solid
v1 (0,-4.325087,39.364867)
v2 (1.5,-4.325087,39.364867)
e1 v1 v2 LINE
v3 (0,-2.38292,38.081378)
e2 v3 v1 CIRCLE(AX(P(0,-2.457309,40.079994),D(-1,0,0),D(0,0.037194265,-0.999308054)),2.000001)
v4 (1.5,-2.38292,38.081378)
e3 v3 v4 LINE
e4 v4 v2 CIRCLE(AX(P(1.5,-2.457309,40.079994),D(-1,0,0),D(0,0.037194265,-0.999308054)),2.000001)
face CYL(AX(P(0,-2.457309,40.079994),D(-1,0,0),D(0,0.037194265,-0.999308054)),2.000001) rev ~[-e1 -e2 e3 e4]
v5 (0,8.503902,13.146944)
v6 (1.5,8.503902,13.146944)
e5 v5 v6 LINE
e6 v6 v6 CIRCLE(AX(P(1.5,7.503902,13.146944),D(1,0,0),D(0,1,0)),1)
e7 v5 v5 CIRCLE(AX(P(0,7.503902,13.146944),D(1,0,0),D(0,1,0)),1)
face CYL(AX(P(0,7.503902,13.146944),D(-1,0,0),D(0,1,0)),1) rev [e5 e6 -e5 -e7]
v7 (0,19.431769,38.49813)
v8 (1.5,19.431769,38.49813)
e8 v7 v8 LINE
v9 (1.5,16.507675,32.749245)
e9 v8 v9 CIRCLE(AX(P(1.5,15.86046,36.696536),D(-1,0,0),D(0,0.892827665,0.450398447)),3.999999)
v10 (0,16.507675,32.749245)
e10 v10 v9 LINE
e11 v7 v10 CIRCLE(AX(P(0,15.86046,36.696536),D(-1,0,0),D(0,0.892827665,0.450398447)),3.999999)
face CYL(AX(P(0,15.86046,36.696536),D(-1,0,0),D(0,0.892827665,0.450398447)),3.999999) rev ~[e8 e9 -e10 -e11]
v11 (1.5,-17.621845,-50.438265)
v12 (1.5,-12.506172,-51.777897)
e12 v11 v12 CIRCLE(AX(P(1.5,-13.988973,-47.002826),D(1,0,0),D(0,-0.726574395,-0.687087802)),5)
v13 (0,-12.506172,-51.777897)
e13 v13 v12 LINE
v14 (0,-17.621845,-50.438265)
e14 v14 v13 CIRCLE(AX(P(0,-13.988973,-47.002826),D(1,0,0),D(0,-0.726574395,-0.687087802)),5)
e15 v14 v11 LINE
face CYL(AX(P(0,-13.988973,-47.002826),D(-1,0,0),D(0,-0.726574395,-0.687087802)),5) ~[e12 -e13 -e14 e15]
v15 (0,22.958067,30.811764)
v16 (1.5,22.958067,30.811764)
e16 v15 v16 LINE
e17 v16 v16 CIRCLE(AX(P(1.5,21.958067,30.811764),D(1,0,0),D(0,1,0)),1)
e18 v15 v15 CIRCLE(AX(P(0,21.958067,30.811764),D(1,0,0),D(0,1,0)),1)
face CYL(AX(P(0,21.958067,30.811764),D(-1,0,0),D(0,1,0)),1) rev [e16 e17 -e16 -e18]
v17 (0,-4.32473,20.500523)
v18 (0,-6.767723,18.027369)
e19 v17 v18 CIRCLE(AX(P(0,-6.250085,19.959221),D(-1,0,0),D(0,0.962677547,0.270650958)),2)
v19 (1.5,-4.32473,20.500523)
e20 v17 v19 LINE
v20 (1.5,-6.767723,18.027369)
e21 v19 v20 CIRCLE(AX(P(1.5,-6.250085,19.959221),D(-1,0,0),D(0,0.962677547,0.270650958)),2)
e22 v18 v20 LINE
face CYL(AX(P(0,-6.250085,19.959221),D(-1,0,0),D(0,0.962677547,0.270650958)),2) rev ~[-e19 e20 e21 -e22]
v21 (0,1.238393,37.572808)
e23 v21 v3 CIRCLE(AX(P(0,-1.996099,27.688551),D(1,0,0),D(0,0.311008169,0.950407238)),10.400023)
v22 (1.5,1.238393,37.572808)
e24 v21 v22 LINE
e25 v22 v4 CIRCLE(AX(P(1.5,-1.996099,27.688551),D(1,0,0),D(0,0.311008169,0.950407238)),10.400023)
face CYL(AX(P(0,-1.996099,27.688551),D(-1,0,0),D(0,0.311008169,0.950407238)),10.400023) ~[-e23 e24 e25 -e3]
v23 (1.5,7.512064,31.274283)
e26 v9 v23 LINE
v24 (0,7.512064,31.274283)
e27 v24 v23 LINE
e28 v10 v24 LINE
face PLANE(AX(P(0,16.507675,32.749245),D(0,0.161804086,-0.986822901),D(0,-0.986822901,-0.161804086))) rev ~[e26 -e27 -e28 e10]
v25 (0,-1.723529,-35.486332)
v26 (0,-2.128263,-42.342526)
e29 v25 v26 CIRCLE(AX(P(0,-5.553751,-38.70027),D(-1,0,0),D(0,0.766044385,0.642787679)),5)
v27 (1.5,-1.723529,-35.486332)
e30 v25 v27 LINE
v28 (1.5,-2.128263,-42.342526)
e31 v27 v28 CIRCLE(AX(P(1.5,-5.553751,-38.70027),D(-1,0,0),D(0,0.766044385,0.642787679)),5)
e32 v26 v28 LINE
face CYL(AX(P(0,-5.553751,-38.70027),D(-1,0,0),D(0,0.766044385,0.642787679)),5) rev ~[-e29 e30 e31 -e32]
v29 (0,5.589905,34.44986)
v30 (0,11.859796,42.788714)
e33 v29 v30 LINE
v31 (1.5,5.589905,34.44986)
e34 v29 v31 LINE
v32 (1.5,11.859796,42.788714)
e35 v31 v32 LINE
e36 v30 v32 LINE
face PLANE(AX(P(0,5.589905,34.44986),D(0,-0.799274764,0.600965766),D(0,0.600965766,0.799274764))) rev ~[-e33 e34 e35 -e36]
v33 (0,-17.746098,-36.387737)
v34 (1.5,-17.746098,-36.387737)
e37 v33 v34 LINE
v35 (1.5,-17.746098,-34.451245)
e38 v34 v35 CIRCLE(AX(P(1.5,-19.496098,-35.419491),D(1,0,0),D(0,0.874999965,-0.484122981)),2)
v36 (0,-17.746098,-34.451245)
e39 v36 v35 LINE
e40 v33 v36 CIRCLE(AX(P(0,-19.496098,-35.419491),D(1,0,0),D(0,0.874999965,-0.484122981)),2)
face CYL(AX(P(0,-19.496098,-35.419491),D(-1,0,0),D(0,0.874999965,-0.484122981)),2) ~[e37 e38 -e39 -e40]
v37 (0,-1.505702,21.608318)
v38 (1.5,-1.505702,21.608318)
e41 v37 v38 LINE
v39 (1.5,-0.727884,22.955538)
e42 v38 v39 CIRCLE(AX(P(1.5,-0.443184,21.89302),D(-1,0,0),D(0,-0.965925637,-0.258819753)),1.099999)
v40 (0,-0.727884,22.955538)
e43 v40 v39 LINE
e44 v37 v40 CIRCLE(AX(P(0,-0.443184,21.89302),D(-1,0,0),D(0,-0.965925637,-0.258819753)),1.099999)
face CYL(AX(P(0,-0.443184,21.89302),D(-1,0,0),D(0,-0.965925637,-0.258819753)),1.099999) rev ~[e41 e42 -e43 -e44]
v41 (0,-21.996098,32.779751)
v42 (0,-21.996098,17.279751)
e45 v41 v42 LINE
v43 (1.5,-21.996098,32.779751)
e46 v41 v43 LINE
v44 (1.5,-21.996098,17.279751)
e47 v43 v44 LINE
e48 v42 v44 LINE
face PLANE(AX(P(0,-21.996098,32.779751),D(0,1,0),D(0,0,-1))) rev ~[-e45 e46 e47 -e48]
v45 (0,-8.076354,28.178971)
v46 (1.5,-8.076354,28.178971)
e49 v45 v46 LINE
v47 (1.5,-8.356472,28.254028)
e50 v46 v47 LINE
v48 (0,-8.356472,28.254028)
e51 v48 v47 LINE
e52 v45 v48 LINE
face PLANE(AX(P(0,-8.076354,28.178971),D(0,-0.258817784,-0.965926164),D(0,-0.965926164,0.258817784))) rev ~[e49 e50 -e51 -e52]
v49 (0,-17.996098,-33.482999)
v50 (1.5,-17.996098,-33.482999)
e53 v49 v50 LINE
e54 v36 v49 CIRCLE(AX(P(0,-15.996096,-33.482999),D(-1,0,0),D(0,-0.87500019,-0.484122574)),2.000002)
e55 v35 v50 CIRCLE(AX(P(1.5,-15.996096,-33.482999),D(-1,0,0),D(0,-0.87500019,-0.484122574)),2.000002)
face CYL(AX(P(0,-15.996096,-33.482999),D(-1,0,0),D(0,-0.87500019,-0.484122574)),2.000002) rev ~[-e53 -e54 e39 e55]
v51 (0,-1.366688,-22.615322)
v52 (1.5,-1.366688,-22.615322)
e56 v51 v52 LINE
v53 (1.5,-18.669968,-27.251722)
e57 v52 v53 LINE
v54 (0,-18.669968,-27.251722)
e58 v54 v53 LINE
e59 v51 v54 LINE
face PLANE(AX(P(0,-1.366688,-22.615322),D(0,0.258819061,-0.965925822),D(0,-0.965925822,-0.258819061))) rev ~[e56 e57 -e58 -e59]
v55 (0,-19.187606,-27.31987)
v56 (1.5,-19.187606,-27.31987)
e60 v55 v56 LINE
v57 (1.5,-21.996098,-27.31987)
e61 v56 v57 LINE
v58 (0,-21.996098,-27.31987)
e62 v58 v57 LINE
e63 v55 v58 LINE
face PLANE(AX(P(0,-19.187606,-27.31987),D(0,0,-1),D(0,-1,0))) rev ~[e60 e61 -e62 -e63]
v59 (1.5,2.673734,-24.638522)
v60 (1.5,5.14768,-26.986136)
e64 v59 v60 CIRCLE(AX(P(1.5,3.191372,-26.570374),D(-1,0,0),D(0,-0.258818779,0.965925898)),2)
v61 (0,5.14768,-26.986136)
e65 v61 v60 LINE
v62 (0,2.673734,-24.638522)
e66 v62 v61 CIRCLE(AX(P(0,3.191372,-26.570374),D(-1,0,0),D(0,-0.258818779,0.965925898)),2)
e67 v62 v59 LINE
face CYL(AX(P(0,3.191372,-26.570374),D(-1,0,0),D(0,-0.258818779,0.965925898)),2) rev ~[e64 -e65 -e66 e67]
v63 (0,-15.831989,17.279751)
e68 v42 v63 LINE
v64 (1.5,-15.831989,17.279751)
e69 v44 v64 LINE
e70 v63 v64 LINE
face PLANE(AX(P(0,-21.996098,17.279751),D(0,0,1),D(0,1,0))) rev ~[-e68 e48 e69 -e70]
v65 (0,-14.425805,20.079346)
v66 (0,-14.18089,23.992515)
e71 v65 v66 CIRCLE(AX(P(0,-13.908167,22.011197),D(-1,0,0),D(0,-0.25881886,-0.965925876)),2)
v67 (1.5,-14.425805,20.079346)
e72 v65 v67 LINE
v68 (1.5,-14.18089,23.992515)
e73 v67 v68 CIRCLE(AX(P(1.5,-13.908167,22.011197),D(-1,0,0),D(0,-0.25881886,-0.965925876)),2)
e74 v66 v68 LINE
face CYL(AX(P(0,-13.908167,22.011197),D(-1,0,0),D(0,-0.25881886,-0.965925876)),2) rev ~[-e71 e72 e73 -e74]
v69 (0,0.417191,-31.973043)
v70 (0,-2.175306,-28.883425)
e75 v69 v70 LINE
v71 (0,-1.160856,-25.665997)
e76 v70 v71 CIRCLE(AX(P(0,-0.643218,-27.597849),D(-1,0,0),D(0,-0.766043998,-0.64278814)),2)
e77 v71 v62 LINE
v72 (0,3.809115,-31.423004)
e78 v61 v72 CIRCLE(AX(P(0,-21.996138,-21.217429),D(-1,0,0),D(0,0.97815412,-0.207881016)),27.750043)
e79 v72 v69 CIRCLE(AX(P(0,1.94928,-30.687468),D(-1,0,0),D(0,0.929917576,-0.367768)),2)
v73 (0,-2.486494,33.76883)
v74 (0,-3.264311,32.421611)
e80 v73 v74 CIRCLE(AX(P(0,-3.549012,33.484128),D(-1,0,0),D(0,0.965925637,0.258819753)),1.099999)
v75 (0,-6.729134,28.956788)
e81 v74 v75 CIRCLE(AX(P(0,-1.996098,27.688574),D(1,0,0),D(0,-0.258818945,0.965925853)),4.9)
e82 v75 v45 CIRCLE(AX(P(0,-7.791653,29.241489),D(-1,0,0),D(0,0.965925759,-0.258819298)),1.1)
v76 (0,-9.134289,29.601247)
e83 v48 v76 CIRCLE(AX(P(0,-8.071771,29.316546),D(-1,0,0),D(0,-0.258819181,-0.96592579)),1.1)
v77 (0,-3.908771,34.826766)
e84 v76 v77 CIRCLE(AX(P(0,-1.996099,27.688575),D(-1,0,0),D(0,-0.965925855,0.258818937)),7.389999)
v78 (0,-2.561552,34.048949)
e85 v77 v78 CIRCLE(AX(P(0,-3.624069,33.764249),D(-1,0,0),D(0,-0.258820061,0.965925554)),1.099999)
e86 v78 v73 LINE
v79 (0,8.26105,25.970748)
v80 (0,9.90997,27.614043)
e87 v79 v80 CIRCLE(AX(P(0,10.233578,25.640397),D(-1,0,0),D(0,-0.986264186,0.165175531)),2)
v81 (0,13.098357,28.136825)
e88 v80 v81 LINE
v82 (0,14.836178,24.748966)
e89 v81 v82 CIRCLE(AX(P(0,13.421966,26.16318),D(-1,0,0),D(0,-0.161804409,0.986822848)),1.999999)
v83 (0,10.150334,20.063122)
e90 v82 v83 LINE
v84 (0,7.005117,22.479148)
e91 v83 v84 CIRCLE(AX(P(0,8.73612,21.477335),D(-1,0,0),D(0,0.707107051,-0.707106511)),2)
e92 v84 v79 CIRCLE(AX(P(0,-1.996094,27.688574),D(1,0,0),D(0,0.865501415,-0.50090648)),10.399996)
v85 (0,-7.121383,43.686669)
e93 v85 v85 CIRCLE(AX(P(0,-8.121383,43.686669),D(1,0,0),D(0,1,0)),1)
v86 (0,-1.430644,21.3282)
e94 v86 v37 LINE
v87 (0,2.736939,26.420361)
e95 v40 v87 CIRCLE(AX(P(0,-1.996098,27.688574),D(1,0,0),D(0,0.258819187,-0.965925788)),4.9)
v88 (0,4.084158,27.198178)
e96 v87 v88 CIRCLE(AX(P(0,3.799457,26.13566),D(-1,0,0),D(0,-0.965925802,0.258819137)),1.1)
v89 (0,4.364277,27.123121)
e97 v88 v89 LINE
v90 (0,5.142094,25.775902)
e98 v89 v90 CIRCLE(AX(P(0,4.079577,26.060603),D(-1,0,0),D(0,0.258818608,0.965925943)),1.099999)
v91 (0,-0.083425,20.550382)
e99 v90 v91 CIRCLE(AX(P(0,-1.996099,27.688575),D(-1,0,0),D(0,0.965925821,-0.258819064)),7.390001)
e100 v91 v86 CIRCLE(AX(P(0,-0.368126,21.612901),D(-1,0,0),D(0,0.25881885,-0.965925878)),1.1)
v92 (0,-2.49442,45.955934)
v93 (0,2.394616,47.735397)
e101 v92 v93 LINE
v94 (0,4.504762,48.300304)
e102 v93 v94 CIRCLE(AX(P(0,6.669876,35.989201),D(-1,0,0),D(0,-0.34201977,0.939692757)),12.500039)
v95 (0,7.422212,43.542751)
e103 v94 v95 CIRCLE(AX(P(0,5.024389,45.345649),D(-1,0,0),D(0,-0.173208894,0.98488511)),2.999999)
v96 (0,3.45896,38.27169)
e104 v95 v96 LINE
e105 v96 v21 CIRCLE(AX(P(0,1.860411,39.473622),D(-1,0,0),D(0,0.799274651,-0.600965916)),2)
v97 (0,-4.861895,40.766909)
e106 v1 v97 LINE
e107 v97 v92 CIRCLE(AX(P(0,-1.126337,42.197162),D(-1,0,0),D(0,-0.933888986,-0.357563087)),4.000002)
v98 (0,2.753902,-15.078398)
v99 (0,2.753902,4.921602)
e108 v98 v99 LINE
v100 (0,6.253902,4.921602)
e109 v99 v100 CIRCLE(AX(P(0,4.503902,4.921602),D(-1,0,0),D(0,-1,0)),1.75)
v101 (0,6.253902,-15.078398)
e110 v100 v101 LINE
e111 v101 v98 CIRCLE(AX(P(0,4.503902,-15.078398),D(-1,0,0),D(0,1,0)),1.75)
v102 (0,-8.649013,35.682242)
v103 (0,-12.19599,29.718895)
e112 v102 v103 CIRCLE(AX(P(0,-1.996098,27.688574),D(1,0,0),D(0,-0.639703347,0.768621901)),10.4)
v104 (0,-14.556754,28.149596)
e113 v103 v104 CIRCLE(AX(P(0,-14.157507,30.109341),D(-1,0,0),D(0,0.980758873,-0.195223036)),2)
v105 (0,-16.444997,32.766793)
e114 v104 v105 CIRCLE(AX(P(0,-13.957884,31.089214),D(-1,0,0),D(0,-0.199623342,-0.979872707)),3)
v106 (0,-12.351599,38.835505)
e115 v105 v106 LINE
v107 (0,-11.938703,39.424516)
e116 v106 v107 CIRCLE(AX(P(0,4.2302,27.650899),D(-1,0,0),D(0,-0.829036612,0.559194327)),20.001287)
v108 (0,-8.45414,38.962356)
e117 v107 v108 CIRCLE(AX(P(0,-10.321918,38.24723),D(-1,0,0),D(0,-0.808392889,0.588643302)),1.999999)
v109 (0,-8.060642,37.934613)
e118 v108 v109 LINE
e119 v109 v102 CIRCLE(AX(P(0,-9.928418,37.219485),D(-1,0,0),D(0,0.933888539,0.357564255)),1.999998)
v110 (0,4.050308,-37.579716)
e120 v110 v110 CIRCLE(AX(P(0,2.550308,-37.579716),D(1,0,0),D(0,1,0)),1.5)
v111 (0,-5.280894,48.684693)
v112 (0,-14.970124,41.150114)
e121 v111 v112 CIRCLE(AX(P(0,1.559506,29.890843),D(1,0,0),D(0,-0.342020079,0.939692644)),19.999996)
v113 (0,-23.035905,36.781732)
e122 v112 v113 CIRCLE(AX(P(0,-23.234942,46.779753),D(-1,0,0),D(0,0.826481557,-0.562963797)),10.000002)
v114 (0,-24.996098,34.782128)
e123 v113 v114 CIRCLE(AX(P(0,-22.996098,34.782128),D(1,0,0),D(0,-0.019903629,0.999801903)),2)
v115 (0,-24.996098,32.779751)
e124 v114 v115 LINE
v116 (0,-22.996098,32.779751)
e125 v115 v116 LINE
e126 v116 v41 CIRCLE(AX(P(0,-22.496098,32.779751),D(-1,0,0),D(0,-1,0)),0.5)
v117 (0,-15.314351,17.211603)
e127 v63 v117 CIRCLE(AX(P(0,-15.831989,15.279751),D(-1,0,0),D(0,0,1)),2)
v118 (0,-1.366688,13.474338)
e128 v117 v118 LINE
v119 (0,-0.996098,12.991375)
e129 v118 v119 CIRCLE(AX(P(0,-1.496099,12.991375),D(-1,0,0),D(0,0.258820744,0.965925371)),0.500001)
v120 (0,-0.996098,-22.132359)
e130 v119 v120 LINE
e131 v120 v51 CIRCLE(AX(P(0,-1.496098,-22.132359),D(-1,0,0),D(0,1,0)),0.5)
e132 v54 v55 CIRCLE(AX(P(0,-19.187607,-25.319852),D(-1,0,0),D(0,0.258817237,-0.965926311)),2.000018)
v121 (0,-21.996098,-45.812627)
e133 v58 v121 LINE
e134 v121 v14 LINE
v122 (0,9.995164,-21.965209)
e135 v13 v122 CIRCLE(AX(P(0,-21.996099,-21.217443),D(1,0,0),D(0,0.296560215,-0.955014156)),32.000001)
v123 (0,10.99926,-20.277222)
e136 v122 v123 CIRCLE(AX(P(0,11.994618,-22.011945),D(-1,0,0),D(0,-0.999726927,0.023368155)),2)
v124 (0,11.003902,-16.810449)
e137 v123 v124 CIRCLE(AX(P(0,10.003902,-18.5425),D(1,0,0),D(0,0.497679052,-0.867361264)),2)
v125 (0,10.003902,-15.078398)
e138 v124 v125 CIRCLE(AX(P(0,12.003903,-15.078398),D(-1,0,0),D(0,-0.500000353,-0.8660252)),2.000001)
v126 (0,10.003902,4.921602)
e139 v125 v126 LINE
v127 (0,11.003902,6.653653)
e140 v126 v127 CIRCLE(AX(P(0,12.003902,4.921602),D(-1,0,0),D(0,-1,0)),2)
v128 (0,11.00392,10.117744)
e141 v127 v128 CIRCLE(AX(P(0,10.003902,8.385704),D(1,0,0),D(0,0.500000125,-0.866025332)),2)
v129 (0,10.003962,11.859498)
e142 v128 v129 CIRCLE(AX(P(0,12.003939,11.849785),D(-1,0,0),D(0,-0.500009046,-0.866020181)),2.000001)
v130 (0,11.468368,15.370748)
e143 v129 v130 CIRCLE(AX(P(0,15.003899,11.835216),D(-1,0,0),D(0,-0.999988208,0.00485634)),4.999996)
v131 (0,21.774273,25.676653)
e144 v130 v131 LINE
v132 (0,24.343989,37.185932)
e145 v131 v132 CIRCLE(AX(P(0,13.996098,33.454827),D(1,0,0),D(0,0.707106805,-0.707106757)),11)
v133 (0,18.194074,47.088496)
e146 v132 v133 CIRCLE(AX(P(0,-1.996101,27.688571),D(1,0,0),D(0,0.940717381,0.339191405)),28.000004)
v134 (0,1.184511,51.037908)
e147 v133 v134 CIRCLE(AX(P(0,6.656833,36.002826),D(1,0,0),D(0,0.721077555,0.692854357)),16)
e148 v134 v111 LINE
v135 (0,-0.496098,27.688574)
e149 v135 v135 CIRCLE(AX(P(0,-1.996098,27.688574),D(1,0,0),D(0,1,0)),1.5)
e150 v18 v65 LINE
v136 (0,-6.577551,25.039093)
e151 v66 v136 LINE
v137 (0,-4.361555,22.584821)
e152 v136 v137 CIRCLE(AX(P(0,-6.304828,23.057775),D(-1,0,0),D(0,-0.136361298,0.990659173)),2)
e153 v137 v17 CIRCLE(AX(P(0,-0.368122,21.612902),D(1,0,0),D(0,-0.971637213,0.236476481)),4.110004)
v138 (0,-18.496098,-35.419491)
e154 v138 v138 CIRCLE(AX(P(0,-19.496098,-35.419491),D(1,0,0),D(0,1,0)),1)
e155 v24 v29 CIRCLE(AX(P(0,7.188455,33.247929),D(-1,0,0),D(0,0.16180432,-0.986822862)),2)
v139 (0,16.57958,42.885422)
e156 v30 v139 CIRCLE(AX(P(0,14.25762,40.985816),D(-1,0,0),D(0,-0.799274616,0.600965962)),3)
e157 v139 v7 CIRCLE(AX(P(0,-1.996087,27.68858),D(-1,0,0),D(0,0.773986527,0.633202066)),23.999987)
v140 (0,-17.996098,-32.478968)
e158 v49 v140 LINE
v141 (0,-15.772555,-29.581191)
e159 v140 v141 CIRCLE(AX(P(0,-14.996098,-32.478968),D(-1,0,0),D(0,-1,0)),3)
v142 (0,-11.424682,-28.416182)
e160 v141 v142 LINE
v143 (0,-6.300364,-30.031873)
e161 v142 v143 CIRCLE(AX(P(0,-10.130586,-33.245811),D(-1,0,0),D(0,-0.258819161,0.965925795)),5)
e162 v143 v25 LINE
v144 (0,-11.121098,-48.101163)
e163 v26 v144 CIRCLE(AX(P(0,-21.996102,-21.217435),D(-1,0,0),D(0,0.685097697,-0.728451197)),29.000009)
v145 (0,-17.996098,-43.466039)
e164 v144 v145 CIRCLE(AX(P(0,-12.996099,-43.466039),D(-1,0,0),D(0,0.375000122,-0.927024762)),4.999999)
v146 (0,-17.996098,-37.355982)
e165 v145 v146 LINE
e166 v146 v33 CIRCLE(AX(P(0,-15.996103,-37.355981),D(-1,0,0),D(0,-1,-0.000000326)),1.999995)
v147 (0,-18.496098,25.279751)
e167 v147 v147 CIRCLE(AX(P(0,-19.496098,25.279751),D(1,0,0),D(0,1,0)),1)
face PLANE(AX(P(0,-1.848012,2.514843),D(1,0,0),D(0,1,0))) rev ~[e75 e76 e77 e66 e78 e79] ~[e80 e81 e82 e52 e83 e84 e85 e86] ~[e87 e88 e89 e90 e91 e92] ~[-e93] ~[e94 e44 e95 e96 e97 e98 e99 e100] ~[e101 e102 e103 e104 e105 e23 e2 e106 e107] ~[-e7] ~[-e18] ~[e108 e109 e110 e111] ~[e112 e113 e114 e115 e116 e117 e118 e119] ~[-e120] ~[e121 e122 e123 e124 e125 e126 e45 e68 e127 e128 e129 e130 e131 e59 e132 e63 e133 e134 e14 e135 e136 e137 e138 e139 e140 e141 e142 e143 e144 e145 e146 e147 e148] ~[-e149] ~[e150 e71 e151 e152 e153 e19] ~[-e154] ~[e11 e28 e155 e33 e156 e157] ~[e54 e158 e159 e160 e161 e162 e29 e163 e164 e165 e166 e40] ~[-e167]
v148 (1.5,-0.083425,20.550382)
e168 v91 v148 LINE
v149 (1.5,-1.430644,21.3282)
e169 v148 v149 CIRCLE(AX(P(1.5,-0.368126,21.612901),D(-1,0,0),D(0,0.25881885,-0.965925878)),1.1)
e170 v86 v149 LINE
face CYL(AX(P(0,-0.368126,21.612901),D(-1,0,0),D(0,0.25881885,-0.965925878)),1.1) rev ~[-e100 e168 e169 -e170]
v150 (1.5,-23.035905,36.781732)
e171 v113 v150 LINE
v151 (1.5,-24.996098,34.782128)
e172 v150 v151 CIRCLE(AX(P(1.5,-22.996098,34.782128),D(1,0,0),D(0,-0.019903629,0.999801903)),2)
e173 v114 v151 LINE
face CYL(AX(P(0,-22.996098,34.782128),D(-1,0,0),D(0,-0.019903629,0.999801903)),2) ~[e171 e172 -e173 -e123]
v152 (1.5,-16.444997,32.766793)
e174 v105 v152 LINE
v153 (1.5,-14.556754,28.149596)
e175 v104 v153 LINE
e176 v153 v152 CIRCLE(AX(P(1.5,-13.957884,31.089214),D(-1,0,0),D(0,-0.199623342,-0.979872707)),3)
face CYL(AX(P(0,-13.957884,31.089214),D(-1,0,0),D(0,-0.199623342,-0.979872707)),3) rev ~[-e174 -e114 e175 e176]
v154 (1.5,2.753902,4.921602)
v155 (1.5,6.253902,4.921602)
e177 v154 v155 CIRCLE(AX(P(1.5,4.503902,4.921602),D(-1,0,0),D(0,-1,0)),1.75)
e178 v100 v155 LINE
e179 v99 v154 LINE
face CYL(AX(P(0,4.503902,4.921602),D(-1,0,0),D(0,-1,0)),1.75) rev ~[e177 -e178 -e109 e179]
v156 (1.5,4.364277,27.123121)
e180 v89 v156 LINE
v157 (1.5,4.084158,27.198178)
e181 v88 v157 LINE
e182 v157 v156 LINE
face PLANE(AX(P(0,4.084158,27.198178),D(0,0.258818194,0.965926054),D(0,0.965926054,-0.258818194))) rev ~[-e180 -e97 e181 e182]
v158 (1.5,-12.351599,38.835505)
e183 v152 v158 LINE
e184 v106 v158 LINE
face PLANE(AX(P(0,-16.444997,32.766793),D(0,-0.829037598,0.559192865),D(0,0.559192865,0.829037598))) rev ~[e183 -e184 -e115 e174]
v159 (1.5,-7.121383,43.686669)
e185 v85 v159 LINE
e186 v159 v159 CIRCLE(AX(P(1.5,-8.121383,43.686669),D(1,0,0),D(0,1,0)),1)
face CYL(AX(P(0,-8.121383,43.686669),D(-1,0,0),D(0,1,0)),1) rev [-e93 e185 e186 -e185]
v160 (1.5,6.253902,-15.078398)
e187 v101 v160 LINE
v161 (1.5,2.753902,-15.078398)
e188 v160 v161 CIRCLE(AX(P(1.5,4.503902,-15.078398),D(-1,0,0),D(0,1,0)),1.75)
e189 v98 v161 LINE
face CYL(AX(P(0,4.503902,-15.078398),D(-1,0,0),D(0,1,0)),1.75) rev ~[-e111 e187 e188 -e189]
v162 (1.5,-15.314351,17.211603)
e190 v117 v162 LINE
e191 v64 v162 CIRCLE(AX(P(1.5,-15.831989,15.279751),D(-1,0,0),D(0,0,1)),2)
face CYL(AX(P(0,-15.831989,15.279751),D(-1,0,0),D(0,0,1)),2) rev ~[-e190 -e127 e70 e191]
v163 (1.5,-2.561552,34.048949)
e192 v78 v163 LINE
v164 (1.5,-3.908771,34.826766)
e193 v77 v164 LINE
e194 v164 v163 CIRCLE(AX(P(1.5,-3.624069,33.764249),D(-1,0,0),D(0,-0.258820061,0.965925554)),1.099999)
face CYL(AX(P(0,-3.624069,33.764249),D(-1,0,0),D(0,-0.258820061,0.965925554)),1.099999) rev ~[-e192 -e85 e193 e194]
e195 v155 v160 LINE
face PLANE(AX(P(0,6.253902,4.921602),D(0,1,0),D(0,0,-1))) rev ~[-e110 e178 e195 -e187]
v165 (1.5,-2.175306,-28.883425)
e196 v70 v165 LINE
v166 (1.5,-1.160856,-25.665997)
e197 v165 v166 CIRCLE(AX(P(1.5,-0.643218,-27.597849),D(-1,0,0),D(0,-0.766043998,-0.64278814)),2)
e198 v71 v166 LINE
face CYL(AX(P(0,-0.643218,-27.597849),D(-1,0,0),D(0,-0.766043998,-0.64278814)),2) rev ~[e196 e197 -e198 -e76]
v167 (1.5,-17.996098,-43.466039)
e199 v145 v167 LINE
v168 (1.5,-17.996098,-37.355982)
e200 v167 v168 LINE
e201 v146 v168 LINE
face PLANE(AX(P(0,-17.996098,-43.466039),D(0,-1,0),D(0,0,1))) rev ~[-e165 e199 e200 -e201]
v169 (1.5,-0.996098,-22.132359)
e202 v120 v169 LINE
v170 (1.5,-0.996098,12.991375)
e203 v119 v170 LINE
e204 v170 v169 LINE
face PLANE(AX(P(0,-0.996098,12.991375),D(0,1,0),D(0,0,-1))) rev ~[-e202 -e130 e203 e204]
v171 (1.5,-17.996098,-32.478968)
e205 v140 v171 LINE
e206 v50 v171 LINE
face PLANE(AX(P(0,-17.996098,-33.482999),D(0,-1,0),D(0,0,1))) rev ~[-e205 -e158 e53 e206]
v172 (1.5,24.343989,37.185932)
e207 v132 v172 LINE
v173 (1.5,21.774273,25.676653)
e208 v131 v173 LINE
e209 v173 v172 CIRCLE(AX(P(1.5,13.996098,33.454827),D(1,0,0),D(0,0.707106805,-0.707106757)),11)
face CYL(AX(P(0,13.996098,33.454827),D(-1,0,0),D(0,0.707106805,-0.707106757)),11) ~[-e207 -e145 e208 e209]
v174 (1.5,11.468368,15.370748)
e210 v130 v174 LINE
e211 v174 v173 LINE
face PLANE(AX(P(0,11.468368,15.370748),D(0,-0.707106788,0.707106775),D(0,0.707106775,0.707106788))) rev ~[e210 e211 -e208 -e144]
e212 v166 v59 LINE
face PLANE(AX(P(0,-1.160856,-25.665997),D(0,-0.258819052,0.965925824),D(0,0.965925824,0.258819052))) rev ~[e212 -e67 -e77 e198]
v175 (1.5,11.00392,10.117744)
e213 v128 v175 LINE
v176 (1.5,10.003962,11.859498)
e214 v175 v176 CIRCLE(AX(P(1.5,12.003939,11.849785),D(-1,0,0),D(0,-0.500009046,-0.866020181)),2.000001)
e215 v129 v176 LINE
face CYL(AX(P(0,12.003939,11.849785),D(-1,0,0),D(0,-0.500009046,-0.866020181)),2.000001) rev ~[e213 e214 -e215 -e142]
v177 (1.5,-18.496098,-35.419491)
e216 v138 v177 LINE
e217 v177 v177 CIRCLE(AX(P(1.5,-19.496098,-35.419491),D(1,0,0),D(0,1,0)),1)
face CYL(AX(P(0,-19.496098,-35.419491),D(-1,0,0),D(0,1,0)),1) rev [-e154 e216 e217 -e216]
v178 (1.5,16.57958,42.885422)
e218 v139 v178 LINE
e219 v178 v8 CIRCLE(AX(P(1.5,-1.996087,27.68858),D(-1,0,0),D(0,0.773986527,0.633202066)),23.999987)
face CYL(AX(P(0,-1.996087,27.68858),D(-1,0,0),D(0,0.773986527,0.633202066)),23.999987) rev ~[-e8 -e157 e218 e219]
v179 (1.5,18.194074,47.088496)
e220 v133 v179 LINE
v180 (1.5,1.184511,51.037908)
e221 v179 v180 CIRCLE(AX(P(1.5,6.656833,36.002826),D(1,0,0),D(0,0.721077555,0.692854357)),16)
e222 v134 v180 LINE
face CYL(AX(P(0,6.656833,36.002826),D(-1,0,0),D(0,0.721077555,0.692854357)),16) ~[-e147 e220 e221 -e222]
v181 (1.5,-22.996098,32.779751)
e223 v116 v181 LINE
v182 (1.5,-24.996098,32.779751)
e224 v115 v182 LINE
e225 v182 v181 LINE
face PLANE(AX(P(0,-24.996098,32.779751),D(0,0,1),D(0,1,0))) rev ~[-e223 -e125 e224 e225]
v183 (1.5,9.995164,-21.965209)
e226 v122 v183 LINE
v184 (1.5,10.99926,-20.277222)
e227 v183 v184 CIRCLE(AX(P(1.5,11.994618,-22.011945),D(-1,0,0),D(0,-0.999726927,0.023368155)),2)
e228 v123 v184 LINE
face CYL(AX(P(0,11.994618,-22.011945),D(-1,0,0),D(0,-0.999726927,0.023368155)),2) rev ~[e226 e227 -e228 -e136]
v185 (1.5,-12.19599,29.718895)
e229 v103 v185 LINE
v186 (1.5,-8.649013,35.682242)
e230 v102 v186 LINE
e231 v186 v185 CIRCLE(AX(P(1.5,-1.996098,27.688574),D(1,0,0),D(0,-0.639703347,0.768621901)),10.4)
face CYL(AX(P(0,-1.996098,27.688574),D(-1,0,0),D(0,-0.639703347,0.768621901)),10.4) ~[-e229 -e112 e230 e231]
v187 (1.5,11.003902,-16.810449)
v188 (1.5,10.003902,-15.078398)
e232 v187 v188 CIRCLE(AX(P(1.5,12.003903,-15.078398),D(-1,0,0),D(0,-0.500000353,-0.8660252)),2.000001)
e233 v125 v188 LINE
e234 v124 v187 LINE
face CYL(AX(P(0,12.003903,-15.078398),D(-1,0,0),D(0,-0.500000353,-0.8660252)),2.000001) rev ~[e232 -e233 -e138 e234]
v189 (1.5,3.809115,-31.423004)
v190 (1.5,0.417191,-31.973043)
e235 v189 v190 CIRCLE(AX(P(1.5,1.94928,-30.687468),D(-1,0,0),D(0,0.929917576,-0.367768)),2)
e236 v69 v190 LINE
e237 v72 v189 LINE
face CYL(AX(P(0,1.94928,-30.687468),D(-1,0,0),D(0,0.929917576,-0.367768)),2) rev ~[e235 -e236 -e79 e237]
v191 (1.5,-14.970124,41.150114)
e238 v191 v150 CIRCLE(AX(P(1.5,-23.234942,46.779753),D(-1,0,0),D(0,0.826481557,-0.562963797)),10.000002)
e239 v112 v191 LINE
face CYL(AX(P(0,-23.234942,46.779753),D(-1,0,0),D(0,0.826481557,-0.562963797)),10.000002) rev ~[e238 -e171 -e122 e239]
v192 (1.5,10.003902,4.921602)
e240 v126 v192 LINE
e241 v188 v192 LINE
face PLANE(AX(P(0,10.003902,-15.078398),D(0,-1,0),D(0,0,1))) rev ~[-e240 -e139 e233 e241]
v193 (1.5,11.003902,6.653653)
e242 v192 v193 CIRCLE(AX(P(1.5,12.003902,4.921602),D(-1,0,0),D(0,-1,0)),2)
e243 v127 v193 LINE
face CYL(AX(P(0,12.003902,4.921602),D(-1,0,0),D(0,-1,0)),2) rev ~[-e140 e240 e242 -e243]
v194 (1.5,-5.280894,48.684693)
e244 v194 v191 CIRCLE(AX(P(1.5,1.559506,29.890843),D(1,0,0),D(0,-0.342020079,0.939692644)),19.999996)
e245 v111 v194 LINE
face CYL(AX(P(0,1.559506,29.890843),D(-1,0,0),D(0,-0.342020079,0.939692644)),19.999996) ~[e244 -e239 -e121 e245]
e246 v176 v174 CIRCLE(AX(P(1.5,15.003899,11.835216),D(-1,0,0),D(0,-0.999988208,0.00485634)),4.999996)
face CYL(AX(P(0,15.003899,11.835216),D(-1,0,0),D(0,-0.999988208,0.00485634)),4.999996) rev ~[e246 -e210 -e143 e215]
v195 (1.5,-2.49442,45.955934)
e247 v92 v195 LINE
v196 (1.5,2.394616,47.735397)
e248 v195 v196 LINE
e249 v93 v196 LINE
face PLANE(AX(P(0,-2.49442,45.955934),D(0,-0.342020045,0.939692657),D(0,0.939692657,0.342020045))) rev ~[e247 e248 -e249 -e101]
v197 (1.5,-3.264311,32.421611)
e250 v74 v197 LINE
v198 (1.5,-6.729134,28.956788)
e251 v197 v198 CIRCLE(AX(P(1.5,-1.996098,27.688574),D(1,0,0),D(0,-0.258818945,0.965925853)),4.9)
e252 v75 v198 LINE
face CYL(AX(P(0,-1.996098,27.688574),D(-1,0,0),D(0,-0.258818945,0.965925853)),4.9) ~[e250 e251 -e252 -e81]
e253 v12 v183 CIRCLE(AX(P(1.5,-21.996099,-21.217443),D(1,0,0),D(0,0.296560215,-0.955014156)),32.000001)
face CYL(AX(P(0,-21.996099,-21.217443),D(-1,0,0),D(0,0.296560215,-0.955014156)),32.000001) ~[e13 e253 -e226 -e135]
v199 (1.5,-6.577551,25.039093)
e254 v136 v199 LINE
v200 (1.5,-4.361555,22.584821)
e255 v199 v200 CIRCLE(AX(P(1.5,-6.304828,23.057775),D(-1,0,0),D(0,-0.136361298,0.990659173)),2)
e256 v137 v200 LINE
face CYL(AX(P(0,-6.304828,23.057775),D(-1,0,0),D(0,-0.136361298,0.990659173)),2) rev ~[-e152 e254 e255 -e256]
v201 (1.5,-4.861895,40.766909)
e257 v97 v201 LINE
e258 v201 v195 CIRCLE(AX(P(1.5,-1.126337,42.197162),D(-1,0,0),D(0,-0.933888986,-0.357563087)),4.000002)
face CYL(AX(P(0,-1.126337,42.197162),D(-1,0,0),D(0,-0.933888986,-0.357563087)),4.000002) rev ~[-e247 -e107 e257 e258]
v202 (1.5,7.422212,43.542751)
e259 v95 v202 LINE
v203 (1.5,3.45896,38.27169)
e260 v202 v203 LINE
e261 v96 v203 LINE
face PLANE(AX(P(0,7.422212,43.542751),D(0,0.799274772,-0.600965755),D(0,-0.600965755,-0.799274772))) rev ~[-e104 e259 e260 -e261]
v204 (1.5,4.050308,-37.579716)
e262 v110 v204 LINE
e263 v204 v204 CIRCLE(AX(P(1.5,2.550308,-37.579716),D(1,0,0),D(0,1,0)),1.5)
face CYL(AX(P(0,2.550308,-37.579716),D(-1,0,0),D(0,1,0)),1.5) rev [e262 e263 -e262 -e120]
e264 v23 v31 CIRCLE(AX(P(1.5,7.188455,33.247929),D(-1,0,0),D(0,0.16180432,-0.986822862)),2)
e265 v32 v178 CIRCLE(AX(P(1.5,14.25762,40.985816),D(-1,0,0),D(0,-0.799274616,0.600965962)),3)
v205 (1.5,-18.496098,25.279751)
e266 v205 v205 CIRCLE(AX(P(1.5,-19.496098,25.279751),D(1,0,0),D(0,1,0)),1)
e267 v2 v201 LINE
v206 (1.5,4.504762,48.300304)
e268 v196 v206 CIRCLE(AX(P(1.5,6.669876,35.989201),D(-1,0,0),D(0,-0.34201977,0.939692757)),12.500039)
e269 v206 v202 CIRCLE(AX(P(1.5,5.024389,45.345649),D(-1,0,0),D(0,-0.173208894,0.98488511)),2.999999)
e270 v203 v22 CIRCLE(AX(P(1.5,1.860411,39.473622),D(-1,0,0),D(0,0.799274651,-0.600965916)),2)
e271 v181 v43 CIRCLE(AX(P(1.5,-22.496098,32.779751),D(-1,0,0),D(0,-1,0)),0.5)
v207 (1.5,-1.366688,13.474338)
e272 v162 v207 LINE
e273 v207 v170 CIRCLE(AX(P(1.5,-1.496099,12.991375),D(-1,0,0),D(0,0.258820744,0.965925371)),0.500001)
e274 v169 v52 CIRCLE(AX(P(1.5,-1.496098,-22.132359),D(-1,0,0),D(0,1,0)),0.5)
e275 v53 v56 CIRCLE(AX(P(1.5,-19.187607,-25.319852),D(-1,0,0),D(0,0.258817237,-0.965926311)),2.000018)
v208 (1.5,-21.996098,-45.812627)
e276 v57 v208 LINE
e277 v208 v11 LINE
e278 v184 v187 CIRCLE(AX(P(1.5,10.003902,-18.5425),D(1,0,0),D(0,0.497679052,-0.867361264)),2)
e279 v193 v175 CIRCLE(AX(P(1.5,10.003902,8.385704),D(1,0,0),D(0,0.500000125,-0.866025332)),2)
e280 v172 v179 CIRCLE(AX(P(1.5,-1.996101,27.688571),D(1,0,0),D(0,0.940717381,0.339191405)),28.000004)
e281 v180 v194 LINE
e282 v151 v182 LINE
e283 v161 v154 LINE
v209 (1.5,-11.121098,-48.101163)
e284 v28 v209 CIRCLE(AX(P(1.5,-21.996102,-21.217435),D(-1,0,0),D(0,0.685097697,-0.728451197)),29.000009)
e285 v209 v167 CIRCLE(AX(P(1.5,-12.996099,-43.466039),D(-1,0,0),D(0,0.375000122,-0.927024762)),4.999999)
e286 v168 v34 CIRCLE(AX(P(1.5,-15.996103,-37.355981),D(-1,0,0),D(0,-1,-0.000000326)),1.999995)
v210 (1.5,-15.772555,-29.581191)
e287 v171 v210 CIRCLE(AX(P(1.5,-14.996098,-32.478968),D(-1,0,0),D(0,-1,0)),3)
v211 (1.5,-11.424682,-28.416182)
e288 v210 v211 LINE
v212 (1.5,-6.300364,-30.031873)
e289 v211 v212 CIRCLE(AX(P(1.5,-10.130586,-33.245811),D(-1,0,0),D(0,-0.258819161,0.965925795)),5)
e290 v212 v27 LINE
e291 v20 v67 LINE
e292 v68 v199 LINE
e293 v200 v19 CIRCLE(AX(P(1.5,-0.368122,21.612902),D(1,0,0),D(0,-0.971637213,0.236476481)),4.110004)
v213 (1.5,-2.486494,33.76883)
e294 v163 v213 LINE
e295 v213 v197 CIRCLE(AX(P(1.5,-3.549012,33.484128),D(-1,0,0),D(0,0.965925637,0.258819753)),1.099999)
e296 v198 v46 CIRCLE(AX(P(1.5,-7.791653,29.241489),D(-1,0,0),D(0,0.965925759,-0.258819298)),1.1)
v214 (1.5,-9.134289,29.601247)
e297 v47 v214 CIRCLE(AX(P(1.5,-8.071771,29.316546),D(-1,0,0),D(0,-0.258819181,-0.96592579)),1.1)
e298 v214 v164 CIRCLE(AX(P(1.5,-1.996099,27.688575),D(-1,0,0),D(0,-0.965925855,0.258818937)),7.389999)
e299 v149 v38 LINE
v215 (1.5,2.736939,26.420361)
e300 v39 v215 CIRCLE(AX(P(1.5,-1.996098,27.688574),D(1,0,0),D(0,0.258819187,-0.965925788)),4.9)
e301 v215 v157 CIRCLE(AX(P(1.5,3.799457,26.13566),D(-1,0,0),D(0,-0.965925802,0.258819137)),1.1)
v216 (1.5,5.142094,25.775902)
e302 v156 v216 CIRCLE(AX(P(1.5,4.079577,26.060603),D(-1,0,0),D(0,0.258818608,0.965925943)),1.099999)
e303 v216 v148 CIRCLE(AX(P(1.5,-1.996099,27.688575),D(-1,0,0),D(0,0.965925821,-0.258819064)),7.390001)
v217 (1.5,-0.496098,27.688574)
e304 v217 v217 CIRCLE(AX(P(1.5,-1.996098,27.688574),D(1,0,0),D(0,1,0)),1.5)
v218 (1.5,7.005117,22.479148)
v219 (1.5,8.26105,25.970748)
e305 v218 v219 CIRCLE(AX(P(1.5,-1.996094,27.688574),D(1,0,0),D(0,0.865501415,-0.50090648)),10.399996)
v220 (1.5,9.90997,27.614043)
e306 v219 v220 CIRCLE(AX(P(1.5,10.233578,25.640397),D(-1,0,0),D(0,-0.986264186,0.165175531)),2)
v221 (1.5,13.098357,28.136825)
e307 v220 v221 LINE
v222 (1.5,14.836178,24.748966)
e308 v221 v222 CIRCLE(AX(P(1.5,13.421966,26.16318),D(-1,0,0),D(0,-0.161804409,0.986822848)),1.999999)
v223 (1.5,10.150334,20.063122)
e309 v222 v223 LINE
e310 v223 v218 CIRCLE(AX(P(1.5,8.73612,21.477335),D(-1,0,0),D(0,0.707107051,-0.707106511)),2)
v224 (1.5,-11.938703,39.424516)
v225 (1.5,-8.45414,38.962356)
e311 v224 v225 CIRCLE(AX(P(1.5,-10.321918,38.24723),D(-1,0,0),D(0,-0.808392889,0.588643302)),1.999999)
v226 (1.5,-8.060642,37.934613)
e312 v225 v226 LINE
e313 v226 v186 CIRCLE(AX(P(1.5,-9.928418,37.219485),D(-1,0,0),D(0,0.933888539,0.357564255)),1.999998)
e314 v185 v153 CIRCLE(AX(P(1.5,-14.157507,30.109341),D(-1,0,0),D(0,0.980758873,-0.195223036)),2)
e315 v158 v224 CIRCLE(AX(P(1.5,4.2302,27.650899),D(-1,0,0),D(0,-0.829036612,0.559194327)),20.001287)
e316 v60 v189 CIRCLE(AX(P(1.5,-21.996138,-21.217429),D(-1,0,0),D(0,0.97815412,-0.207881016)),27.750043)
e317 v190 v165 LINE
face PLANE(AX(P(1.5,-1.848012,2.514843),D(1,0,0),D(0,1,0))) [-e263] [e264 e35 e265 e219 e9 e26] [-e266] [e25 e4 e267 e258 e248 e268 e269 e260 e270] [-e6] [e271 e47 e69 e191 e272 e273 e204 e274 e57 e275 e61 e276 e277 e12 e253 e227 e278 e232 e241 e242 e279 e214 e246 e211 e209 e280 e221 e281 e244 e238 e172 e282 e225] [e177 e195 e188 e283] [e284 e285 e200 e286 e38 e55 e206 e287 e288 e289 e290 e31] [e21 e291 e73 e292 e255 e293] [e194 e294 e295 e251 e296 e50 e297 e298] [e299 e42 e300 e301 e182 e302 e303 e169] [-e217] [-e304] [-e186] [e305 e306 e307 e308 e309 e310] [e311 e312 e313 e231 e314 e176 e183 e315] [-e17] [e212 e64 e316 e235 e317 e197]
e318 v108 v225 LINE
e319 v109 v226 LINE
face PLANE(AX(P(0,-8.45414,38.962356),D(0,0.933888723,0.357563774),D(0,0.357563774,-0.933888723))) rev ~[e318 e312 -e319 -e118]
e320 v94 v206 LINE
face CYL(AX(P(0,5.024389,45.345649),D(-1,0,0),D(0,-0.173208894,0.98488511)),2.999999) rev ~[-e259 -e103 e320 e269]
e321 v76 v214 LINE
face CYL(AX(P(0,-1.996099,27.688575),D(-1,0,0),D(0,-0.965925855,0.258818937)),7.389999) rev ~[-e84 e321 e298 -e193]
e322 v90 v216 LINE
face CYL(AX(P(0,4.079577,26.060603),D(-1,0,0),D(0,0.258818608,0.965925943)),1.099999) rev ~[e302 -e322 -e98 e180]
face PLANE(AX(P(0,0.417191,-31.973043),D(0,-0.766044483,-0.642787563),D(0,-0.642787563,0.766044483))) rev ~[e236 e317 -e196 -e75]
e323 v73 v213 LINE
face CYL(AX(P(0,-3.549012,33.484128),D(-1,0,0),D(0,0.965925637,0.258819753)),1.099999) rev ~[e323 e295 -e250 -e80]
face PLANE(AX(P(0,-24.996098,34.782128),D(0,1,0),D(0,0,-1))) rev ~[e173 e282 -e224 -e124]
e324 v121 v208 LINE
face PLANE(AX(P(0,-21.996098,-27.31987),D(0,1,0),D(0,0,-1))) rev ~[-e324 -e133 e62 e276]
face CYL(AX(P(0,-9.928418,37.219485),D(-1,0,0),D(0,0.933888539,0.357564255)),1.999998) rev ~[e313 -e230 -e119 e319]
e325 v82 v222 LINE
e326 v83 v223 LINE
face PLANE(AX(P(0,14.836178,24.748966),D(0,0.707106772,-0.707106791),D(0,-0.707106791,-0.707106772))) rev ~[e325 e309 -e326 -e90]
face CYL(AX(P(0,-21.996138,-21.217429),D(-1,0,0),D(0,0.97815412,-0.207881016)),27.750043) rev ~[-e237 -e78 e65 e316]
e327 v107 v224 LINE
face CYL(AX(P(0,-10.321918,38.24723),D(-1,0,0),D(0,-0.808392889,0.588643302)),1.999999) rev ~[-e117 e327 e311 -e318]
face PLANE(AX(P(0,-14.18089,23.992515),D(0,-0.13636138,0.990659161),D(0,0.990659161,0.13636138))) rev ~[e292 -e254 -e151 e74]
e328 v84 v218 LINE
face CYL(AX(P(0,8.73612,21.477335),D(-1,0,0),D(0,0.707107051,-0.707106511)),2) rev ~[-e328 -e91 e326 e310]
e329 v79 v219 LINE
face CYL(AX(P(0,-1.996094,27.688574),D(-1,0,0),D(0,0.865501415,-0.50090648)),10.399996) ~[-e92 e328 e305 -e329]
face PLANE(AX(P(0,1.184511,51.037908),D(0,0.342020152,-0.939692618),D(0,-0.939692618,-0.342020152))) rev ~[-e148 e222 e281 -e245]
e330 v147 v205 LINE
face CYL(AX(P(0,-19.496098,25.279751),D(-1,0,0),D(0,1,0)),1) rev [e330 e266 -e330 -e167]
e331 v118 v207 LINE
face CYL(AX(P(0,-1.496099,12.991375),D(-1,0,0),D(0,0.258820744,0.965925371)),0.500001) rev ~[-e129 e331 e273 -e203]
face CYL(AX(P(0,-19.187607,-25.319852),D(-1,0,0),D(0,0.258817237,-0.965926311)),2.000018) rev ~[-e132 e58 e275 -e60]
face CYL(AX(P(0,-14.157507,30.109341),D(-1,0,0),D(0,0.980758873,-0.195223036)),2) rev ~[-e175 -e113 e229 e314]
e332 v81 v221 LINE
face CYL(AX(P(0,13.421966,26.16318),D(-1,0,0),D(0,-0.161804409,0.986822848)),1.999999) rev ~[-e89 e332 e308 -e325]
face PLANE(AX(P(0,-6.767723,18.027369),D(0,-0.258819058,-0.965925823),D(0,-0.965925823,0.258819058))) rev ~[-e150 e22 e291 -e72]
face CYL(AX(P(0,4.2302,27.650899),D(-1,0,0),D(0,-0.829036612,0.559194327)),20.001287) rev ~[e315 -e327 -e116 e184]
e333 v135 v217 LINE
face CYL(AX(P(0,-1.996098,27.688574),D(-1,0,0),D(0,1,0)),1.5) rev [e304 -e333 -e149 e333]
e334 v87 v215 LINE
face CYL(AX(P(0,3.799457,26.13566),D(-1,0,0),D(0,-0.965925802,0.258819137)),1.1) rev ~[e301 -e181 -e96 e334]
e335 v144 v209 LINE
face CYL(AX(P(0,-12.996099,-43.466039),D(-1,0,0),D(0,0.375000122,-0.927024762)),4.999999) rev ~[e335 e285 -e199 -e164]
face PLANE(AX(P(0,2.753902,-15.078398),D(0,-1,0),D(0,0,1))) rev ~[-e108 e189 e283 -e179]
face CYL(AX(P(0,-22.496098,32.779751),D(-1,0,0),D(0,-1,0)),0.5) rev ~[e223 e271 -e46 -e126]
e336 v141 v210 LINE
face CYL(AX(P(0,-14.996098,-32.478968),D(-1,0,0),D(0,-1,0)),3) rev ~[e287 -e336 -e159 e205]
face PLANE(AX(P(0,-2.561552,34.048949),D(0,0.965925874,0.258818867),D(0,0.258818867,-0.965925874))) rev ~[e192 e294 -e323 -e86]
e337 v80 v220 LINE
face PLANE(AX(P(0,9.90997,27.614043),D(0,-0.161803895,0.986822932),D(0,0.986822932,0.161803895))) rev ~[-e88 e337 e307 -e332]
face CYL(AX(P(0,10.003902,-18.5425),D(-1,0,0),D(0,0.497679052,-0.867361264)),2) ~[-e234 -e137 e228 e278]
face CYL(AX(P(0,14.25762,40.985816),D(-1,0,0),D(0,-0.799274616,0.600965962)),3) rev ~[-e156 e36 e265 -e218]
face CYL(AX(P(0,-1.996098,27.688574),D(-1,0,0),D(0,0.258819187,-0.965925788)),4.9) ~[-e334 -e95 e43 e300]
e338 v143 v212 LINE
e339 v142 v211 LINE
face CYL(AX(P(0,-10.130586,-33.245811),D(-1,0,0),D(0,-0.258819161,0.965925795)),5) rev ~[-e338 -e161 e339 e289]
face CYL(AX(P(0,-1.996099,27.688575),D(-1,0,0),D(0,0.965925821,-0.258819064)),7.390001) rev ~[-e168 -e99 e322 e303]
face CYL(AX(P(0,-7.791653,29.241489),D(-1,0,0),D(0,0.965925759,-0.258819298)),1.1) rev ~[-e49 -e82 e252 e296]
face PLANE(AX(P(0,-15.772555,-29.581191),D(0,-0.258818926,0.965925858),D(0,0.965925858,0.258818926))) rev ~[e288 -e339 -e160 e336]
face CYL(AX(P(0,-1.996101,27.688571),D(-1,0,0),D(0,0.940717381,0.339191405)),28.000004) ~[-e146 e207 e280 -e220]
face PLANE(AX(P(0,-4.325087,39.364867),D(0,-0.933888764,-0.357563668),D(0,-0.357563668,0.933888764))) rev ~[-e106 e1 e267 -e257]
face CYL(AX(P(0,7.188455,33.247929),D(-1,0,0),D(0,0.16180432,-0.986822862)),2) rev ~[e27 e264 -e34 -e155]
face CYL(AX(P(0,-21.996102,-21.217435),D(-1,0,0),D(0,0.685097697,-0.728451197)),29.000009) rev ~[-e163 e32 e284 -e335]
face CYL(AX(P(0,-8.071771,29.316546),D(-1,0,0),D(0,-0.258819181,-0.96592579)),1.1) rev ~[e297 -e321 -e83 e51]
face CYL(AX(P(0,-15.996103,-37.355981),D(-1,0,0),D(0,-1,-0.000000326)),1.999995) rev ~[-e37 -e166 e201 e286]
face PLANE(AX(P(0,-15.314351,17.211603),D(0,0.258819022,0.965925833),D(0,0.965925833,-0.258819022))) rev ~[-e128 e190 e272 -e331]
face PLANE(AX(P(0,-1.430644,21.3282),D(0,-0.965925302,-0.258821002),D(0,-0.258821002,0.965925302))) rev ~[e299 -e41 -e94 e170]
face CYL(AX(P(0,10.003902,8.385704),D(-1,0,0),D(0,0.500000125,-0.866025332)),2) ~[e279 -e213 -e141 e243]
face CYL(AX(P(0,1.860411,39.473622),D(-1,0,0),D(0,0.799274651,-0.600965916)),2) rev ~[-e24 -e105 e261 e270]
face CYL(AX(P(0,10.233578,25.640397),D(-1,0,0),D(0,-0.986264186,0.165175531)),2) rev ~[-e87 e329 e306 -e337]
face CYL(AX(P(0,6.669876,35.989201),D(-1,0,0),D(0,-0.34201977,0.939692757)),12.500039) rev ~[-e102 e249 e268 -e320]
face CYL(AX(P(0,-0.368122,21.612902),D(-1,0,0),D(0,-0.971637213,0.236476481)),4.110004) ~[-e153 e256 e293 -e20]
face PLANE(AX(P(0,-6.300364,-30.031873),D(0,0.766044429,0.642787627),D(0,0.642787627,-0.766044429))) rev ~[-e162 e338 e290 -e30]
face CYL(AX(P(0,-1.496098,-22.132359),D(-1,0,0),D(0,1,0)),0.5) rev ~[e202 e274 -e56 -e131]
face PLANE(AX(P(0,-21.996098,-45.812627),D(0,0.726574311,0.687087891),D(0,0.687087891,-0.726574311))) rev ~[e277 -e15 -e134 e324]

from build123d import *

# Parameters (mm, degrees)
F0_R     = 1
F0_R_2   = 1.5
F1_DEPTH = 1.5


# Not quite as in the source:
# - ends of sketch curves that miss each other by under 0.0002 mm in the source are joined


with BuildPart() as f1:
    # F0 (on Right) → F1 (new body)
    with BuildSketch(Plane.YZ):
        with BuildLine():
            Line((-21.996098, -27.31987), (-21.996098, -45.812627))
            Line((-21.996098, -45.812627), (-17.621845, -50.438265))
            ThreePointArc((-17.621845, -50.438265), (-15.2556042555, -51.8397305124), (-12.5061720552, -51.7778968223))
            ThreePointArc((-12.5061720552, -51.7778968223), (3.5454625901, -40.4951161641), (9.9951640259, -21.9652090006))
            ThreePointArc((9.9951640259, -21.9652090006), (10.2757378346, -20.9894720288), (10.9992601785, -20.2772223111))
            ThreePointArc((10.9992601785, -20.2772223111), (12.0039002073, -18.545177798), (11.0039019167, -16.8104491443))
            ThreePointArc((11.0039019167, -16.8104491443), (10.2718512165, -16.0783980417), (10.003902, -15.078398))
            Line((10.003902, -15.078398), (10.003902, 4.921602))
            ThreePointArc((10.003902, 4.921602), (10.2718512165, 5.9216020417), (11.0039020833, 6.6536528557))
            ThreePointArc((11.0039020833, 6.6536528557), (12.003902, 8.3856934558), (11.0039201798, 10.1177443114))
            ThreePointArc((11.0039201798, 10.1177443114), (10.269458941, 10.8540026976), (10.0039615857, 11.8594979972))
            ThreePointArc((10.0039615857, 11.8594979972), (10.3891645141, 13.7598432984), (11.4683680941, 15.3707479059))
            Line((11.4683680941, 15.3707479059), (21.774273, 25.676653))
            ThreePointArc((21.774273, 25.676653), (24.7317604297, 31.0578388491), (24.3439893135, 37.185932113))
            ThreePointArc((24.3439893135, 37.185932113), (21.7900626838, 42.4607965791), (18.1940737554, 47.088495765))
            ThreePointArc((18.1940737554, 47.088495765), (10.2755723108, 51.5882270472), (1.1845109874, 51.0379080347))
            Line((1.1845109874, 51.0379080347), (-5.280894, 48.684693))
            ThreePointArc((-5.280894, 48.684693), (-10.7177919764, 45.6790606822), (-14.9701240908, 41.1501140619))
            ThreePointArc((-14.9701240908, 41.1501140619), (-18.4726000988, 37.9865656192), (-23.0359049993, 36.7817319627))
            ThreePointArc((-23.0359049993, 36.7817319627), (-24.4243161193, 36.1821969282), (-24.996098, 34.782128))
            Line((-24.996098, 34.782128), (-24.996098, 32.779751))
            Line((-24.996098, 32.779751), (-22.996098, 32.779751))
            ThreePointArc((-22.996098, 32.779751), (-22.496098, 33.279751), (-21.996098, 32.779751))
            Line((-21.996098, 32.779751), (-21.996098, 17.279751))
            Line((-21.996098, 17.279751), (-15.831989, 17.279751))
            ThreePointArc((-15.831989, 17.279751), (-15.570936575, 17.2626407174), (-15.3143508308, 17.2116026314))
            Line((-15.3143508308, 17.2116026314), (-1.366688, 13.474338))
            ThreePointArc((-1.366688, 13.474338), (-1.0994211963, 13.2957555405), (-0.996098, 12.991375))
            Line((-0.996098, 12.991375), (-0.996098, -22.132359))
            ThreePointArc((-0.996098, -22.132359), (-1.0994211963, -22.4367395405), (-1.3666880537, -22.6153217996))
            Line((-1.3666880537, -22.6153217996), (-18.669968, -27.251722))
            ThreePointArc((-18.669968, -27.251722), (-18.9265537033, -27.3027597343), (-19.187606, -27.31987))
            Line((-19.187606, -27.31987), (-21.996098, -27.31987))
        make_face()
        with Locations((-19.496098, -35.419491)):
            Circle(F0_R, mode=Mode.SUBTRACT)
        with BuildLine():
            ThreePointArc((-17.7460980692, -36.3877369617), (-17.496098, -35.419491), (-17.7460980692, -34.4512450383))
            ThreePointArc((-17.7460980692, -34.4512450383), (-17.9325896552, -33.9829990692), (-17.996098, -33.482999))
            Line((-17.996098, -33.482999), (-17.996098, -32.478968))
            ThreePointArc((-17.996098, -32.478968), (-17.3761580188, -30.6526837103), (-15.7725551288, -29.5811905194))
            Line((-15.7725551288, -29.5811905194), (-11.424682, -28.416182))
            ThreePointArc((-11.424682, -28.416182), (-8.6270574238, -28.4772261134), (-6.3003638496, -30.0318728738))
            Line((-6.3003638496, -30.0318728738), (-1.723529, -35.486332))
            ThreePointArc((-1.723529, -35.486332), (-0.5624401991, -38.9949163794), (-2.1282627813, -42.3425262325))
            ThreePointArc((-2.1282627813, -42.3425262325), (-6.3573337492, -45.6393399924), (-11.1210981684, -48.1011625838))
            ThreePointArc((-11.1210981684, -48.1011625838), (-15.7911829634, -47.6118199936), (-17.996098, -43.466039))
            Line((-17.996098, -43.466039), (-17.996098, -37.355982))
            ThreePointArc((-17.996098, -37.355982), (-17.9325897646, -36.8559823544), (-17.7460980692, -36.3877369617))
        make_face(mode=Mode.SUBTRACT)
        with Locations((2.550308, -37.579716)):
            Circle(F0_R_2, mode=Mode.SUBTRACT)
        with BuildLine():
            Line((0.417191, -31.973043), (-2.175306, -28.883425))
            ThreePointArc((-2.175306, -28.883425), (-2.5506520894, -26.9964379968), (-1.1608561692, -25.6659973686))
            Line((-1.1608561692, -25.6659973686), (2.673734, -24.638522))
            ThreePointArc((2.673734, -24.638522), (4.5680584745, -25.1196037387), (5.1476802368, -26.9861360503))
            ThreePointArc((5.1476802368, -26.9861360503), (4.5711819336, -29.2325622712), (3.8091151123, -31.4230040444))
            ThreePointArc((3.8091151123, -31.4230040444), (2.2694207433, -32.6616792107), (0.417191, -31.973043))
        make_face(mode=Mode.SUBTRACT)
        with BuildLine():
            Line((2.753902, -15.078398), (2.753902, 4.921602))
            ThreePointArc((2.753902, 4.921602), (4.503902, 6.671602), (6.253902, 4.921602))
            Line((6.253902, 4.921602), (6.253902, -15.078398))
            ThreePointArc((6.253902, -15.078398), (4.503902, -16.828398), (2.753902, -15.078398))
        make_face(mode=Mode.SUBTRACT)
        with Locations((-19.496098, 25.279751)):
            Circle(F0_R, mode=Mode.SUBTRACT)
        with BuildLine():
            Line((-6.767723, 18.027369), (-14.425805, 20.079346))
            ThreePointArc((-14.425805, 20.079346), (-15.9042612839, 22.1361274193), (-14.1808899041, 23.992515303))
            Line((-14.1808899041, 23.992515303), (-6.577551, 25.039093))
            ThreePointArc((-6.577551, 25.039093), (-4.8203932786, 24.3980923464), (-4.3615548361, 22.5848209601))
            ThreePointArc((-4.3615548361, 22.5848209601), (-4.477484693, 21.5402984379), (-4.3247299968, 20.5005230009))
            ThreePointArc((-4.3247299968, 20.5005230009), (-4.8272219648, 18.553710138), (-6.767723, 18.027369))
        make_face(mode=Mode.SUBTRACT)
        with BuildLine():
            ThreePointArc((-14.5567540245, 28.1495958796), (-16.7346535441, 29.9536300539), (-16.4449966717, 32.7667927786))
            Line((-16.4449966717, 32.7667927786), (-12.351599, 38.835505))
            ThreePointArc((-12.351599, 38.835505), (-12.1477989547, 39.1318667137), (-11.9387027549, 39.4245158215))
            ThreePointArc((-11.9387027549, 39.4245158215), (-10.058959181, 40.2298668034), (-8.4541402996, 38.9623558853))
            Line((-8.4541402996, 38.9623558853), (-8.060642, 37.934613))
            ThreePointArc((-8.060642, 37.934613), (-7.9933516406, 36.7140017623), (-8.6490128126, 35.6822417749))
            ThreePointArc((-8.6490128126, 35.6822417749), (-10.9344787533, 33.0050906706), (-12.1959899918, 29.7188949984))
            ThreePointArc((-12.1959899918, 29.7188949984), (-13.050327583, 28.4437625647), (-14.5567540245, 28.1495958796))
        make_face(mode=Mode.SUBTRACT)
        with BuildLine():
            ThreePointArc((-8.3564720989, 28.2540276311), (-9.0243989567, 28.7665460217), (-9.1342894359, 29.6012468489))
            ThreePointArc((-9.1342894359, 29.6012468489), (-7.221617113, 32.914093113), (-3.9087709469, 34.8267658017))
            ThreePointArc((-3.9087709469, 34.8267658017), (-3.0740700217, 34.7168759567), (-2.5615515641, 34.0489488489))
            Line((-2.5615515641, 34.0489488489), (-2.486494, 33.76883))
            ThreePointArc((-2.486494, 33.76883), (-2.5963839786, 32.9341291338), (-3.2643109011, 32.4216106311))
            ThreePointArc((-3.2643109011, 32.4216106311), (-5.4609207948, 31.1533976608), (-6.7291343423, 28.9567880917))
            ThreePointArc((-6.7291343423, 28.9567880917), (-7.2416529097, 28.288861108), (-8.0763538489, 28.1789705641))
            Line((-8.0763538489, 28.1789705641), (-8.3564720989, 28.2540276311))
        make_face(mode=Mode.SUBTRACT)
        with Locations((-1.996098, 27.688574)):
            Circle(F0_R_2, mode=Mode.SUBTRACT)
        with Locations((-8.121383, 43.686669)):
            Circle(F0_R, mode=Mode.SUBTRACT)
        with BuildLine():
            Line((-1.430644, 21.3282), (-1.505702, 21.608318))
            ThreePointArc((-1.505702, 21.608318), (-1.3958117152, 22.4430193965), (-0.7278839158, 22.9555376859))
            ThreePointArc((-0.7278839158, 22.9555376859), (1.4687256608, 24.2237512052), (2.7369386593, 26.4203610913))
            ThreePointArc((2.7369386593, 26.4203610913), (3.2494571338, 27.0882880214), (4.0841580989, 27.1981783689))
            Line((4.0841580989, 27.1981783689), (4.364277, 27.123121))
            ThreePointArc((4.364277, 27.123121), (5.0322040214, 26.6106028662), (5.1420943689, 25.7759019011))
            ThreePointArc((5.1420943689, 25.7759019011), (3.229421546, 22.46305532), (-0.0834248031, 20.5503822653))
            ThreePointArc((-0.0834248031, 20.5503822653), (-0.9181258662, 20.6602729786), (-1.430644, 21.3282))
        make_face(mode=Mode.SUBTRACT)
        with Locations((7.503902, 13.146944)):
            Circle(F0_R, mode=Mode.SUBTRACT)
        with BuildLine():
            ThreePointArc((8.2610496287, 25.9707480622), (8.8217830592, 27.0570250546), (9.9099700271, 27.6140428345))
            Line((9.9099700271, 27.6140428345), (13.098357, 28.136825))
            ThreePointArc((13.098357, 28.136825), (15.2015024129, 27.0760034199), (14.8361780624, 24.7489659376))
            Line((14.8361780624, 24.7489659376), (10.150334, 20.063122))
            ThreePointArc((10.150334, 20.063122), (7.5177667465, 19.8912658497), (7.0051173965, 22.4791483493))
            ThreePointArc((7.0051173965, 22.4791483493), (7.7900633915, 24.1684823506), (8.2610496287, 25.9707480622))
        make_face(mode=Mode.SUBTRACT)
        with BuildLine():
            Line((-2.49442, 45.955934), (2.394616, 47.735397))
            ThreePointArc((2.394616, 47.735397), (3.4373252946, 48.0640337253), (4.5047620376, 48.3003037863))
            ThreePointArc((4.5047620376, 48.3003037863), (7.5818252173, 46.9139330558), (7.422211849, 43.5427511135))
            Line((7.422211849, 43.5427511135), (3.45896, 38.27169))
            ThreePointArc((3.45896, 38.27169), (2.4608377023, 37.5658778413), (1.2383930198, 37.5728080606))
            ThreePointArc((1.2383930198, 37.5728080606), (-0.5497351994, 37.9875076656), (-2.3829199888, 38.0813777001))
            ThreePointArc((-2.3829199888, 38.0813777001), (-3.5599861465, 38.4114308125), (-4.3250867004, 39.3648671147))
            Line((-4.3250867004, 39.3648671147), (-4.861895, 40.766909))
            ThreePointArc((-4.861895, 40.766909), (-4.7654691919, 43.8575037621), (-2.49442, 45.955934))
        make_face(mode=Mode.SUBTRACT)
        with BuildLine():
            ThreePointArc((11.859796151, 42.7887138865), (14.1961631415, 43.985186443), (16.5795798456, 42.8854218737))
            ThreePointArc((16.5795798456, 42.8854218737), (18.1256065821, 40.7697438525), (19.4317694803, 38.4981297378))
            ThreePointArc((19.4317694803, 38.4981297378), (19.4257656197, 34.8830903624), (16.5076749457, 32.7492453311))
            Line((16.5076749457, 32.7492453311), (7.512064, 31.274283))
            ThreePointArc((7.512064, 31.274283), (5.4774784003, 32.2122847196), (5.5899054074, 34.4498604456))
            Line((5.5899054074, 34.4498604456), (11.859796151, 42.7887138865))
        make_face(mode=Mode.SUBTRACT)
        with Locations((21.958067, 30.811764)):
            Circle(F0_R, mode=Mode.SUBTRACT)
    extrude(amount=F1_DEPTH)


solid = f1.part
